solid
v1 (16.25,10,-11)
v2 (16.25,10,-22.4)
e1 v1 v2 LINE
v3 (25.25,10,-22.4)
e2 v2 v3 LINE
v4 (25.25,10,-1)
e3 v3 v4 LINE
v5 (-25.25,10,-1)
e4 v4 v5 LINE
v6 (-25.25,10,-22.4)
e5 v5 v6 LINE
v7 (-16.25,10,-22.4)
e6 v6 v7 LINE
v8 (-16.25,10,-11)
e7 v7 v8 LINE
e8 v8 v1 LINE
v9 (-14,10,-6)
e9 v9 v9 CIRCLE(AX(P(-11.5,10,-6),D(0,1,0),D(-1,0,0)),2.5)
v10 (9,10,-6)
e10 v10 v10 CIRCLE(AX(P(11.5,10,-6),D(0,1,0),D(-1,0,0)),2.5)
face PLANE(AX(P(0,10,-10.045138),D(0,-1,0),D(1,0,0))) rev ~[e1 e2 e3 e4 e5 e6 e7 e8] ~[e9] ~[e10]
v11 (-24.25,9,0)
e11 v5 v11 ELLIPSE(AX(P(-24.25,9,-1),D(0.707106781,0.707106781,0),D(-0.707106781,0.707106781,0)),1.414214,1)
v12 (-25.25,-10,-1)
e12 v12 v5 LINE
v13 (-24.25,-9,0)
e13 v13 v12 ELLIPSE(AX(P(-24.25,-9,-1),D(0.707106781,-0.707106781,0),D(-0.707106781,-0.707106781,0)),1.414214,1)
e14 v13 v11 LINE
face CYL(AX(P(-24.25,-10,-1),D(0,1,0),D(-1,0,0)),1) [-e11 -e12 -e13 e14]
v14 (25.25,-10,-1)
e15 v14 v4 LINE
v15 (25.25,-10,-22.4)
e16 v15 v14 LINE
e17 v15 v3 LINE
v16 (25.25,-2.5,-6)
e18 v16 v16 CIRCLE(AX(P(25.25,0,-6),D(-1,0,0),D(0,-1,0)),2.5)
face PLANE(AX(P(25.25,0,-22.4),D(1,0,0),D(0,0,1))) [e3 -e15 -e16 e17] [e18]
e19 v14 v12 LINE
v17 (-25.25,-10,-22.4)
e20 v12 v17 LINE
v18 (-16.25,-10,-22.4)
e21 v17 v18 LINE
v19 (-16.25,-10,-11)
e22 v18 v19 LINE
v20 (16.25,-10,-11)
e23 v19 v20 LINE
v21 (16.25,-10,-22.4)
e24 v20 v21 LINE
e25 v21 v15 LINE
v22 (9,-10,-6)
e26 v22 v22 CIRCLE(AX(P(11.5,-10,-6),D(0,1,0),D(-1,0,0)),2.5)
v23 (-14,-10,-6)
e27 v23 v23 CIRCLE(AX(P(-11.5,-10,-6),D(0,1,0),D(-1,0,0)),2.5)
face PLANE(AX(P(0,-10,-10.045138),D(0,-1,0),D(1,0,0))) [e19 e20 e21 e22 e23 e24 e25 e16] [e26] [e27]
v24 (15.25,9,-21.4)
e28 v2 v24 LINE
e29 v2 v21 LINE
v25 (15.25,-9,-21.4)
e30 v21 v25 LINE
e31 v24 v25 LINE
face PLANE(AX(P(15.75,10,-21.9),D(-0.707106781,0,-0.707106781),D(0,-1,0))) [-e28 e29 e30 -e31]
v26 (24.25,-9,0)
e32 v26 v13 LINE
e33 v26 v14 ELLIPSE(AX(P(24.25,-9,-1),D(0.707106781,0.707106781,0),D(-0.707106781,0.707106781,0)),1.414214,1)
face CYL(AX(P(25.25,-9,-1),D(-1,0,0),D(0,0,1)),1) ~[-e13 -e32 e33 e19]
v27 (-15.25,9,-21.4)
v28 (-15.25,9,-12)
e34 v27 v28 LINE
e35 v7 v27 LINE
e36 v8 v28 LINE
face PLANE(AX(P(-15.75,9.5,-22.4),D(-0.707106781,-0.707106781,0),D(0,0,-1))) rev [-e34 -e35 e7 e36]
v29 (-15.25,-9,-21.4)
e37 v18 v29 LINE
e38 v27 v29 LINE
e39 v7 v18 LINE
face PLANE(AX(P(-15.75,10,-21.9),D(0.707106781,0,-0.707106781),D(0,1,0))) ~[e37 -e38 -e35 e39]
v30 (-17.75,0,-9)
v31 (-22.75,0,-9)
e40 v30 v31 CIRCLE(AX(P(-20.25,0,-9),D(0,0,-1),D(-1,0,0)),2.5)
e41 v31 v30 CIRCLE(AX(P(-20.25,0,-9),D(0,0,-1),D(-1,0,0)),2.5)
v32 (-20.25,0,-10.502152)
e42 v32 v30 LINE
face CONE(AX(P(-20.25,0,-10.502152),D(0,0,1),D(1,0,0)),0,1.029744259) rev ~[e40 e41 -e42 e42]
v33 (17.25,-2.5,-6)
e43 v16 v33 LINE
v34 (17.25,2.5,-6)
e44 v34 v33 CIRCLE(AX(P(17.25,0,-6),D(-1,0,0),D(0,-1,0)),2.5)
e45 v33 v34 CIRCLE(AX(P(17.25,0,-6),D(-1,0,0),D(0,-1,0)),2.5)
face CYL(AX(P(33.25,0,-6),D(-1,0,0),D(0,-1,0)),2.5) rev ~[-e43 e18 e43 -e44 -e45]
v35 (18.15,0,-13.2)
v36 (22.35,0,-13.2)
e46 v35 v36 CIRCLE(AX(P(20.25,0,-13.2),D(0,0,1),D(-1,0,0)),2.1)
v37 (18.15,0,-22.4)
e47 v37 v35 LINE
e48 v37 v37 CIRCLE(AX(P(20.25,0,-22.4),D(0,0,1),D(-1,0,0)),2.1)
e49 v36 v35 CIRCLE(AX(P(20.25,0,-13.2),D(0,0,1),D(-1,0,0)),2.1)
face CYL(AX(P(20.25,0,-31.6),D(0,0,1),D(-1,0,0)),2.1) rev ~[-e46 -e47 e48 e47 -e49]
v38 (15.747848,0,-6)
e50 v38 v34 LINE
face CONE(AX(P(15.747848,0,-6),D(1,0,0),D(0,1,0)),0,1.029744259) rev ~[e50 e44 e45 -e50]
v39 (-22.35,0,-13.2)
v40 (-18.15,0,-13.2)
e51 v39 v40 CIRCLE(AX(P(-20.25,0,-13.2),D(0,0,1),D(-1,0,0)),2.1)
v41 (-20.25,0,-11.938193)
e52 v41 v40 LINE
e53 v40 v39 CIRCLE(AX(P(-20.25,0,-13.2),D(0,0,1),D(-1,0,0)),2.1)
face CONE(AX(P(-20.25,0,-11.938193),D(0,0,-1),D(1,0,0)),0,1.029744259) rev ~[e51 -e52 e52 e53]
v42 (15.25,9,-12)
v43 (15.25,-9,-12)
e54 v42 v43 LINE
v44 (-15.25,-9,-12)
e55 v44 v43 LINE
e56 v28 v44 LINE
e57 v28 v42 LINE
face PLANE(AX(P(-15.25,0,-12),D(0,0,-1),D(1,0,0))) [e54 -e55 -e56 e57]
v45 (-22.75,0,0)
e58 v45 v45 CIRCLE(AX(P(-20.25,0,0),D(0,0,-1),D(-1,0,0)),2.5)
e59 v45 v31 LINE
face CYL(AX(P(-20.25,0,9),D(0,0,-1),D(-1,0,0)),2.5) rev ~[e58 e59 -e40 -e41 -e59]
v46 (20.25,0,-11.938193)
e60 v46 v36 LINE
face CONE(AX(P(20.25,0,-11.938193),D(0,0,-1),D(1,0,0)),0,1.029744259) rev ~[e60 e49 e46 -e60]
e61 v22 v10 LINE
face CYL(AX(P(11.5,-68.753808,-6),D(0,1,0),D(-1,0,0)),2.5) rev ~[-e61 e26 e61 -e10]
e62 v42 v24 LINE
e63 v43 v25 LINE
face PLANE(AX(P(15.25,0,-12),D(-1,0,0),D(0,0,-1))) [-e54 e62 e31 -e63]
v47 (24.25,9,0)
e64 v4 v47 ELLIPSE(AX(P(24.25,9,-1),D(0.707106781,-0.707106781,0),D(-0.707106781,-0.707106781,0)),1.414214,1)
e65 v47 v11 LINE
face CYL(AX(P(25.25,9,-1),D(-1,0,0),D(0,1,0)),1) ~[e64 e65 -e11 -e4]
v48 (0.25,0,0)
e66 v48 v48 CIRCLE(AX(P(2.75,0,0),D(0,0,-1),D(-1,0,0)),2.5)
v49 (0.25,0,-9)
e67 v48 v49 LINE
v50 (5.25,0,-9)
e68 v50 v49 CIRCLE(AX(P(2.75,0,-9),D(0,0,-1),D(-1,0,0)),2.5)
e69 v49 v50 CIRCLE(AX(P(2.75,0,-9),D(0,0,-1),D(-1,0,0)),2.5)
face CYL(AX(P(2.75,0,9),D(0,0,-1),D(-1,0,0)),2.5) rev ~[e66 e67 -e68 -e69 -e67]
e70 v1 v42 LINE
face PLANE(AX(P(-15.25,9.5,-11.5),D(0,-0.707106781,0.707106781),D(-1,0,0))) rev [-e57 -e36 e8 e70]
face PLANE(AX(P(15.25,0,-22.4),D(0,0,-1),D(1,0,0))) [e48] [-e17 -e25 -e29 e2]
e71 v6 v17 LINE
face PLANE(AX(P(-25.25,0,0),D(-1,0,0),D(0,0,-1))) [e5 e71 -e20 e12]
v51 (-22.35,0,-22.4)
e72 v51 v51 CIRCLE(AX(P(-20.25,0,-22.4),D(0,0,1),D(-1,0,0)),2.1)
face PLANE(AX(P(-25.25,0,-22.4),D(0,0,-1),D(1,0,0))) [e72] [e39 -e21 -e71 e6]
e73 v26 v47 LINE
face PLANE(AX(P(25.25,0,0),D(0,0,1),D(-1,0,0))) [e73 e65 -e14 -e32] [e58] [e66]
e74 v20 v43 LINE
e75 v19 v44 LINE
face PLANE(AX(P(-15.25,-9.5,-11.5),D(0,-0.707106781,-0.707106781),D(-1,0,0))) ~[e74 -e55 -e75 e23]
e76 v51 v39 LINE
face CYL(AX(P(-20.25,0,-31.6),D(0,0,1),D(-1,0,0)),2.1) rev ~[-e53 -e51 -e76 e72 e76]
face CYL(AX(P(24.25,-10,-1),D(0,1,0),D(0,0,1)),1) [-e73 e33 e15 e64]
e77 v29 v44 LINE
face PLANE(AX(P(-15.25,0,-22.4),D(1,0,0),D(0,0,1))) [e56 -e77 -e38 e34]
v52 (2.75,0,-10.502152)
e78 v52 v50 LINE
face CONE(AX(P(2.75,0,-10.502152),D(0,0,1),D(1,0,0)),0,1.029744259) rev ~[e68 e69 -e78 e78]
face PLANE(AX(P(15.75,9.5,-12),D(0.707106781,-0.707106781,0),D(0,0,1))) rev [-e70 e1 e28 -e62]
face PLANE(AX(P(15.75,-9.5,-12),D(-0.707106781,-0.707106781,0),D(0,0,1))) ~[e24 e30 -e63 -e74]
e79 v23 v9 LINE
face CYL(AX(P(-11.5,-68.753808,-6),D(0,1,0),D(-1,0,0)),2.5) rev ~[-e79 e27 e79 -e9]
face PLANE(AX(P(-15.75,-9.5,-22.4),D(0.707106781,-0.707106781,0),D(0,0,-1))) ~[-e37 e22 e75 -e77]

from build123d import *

# Parameters (mm, degrees)
F1_DEPTH = 10
F3_D     = 5
F3_DEPTH = 8
F3_TIP   = 1.5021515476
F5_D     = 4.2
F5_DEPTH = 9.2
F5_TIP   = 1.2618073
F7_D     = 5
F9_D     = 5
F9_DEPTH = 9
F9_TIP   = 1.5021515476
F10_SIZE = 1
F11_R    = 1


# Not quite as in the source:
# - a feature names something its author has since deleted; it is built from what else it names


with BuildPart() as f1:
    # F0 (on Front) → F1 (new body, symmetric)
    with BuildSketch(Plane.XZ):
        Polygon((-25.25, 0), (-25.25, -22.4), (-15.25, -22.4), (-15.25, -12), (15.25, -12), (15.25, -22.4), (25.25, -22.4), (25.25, 0), align=None)
    extrude(amount=F1_DEPTH, both=True)

    # F3
    with Locations(Plane.YZ.offset(25.25)):
        with Locations((0, -6)):
            Hole(F3_D / 2, depth=F3_DEPTH)
            with Locations((0, 0, -(F3_DEPTH + F3_TIP / 2))):  # 118° drill point
                Cone(0, F3_D / 2, F3_TIP, mode=Mode.SUBTRACT)

    # F5
    with Locations(Plane(origin=(0, 0, -22.4), x_dir=(1, 0, 0), z_dir=(0, 0, -1))):
        with Locations((-20.25, 0), (20.25, 0)):
            Hole(F5_D / 2, depth=F5_DEPTH)
            with Locations((0, 0, -(F5_DEPTH + F5_TIP / 2))):  # 118° drill point
                Cone(0, F5_D / 2, F5_TIP, mode=Mode.SUBTRACT)

    # F7 (through all)
    with Locations(Plane.XZ.offset(10)):
        with Locations((11.5, -6), (-11.5, -6)):
            Hole(F7_D / 2)

    # F9
    with Locations(Plane.XY):
        with Locations((-20.25, 0), (2.75, 0)):
            Hole(F9_D / 2, depth=F9_DEPTH)
            with Locations((0, 0, -(F9_DEPTH + F9_TIP / 2))):  # 118° drill point
                Cone(0, F9_D / 2, F9_TIP, mode=Mode.SUBTRACT)

    # F10
    f10_edges = [f1.edges().sort_by_distance(p)[0] for p in [
        (15.25, 0, -22.4),
        (-15.25, 0, -22.4),
        (-15.25, -10, -17.2),
        (0, -10, -12),
        (15.25, -10, -17.2),
        (0, 10, -12),
        (-15.25, 10, -17.2),
        (15.25, 10, -17.2),
    ]]
    chamfer(f10_edges, length=F10_SIZE)

    # F11
    f11_edges = [f1.edges().sort_by_distance(p)[0] for p in [
        (0, 10, 0),
        (0, -10, 0),
        (-25.25, 0, 0),
        (25.25, 0, 0),
    ]]
    fillet(f11_edges, radius=F11_R)


solid = f1.part
